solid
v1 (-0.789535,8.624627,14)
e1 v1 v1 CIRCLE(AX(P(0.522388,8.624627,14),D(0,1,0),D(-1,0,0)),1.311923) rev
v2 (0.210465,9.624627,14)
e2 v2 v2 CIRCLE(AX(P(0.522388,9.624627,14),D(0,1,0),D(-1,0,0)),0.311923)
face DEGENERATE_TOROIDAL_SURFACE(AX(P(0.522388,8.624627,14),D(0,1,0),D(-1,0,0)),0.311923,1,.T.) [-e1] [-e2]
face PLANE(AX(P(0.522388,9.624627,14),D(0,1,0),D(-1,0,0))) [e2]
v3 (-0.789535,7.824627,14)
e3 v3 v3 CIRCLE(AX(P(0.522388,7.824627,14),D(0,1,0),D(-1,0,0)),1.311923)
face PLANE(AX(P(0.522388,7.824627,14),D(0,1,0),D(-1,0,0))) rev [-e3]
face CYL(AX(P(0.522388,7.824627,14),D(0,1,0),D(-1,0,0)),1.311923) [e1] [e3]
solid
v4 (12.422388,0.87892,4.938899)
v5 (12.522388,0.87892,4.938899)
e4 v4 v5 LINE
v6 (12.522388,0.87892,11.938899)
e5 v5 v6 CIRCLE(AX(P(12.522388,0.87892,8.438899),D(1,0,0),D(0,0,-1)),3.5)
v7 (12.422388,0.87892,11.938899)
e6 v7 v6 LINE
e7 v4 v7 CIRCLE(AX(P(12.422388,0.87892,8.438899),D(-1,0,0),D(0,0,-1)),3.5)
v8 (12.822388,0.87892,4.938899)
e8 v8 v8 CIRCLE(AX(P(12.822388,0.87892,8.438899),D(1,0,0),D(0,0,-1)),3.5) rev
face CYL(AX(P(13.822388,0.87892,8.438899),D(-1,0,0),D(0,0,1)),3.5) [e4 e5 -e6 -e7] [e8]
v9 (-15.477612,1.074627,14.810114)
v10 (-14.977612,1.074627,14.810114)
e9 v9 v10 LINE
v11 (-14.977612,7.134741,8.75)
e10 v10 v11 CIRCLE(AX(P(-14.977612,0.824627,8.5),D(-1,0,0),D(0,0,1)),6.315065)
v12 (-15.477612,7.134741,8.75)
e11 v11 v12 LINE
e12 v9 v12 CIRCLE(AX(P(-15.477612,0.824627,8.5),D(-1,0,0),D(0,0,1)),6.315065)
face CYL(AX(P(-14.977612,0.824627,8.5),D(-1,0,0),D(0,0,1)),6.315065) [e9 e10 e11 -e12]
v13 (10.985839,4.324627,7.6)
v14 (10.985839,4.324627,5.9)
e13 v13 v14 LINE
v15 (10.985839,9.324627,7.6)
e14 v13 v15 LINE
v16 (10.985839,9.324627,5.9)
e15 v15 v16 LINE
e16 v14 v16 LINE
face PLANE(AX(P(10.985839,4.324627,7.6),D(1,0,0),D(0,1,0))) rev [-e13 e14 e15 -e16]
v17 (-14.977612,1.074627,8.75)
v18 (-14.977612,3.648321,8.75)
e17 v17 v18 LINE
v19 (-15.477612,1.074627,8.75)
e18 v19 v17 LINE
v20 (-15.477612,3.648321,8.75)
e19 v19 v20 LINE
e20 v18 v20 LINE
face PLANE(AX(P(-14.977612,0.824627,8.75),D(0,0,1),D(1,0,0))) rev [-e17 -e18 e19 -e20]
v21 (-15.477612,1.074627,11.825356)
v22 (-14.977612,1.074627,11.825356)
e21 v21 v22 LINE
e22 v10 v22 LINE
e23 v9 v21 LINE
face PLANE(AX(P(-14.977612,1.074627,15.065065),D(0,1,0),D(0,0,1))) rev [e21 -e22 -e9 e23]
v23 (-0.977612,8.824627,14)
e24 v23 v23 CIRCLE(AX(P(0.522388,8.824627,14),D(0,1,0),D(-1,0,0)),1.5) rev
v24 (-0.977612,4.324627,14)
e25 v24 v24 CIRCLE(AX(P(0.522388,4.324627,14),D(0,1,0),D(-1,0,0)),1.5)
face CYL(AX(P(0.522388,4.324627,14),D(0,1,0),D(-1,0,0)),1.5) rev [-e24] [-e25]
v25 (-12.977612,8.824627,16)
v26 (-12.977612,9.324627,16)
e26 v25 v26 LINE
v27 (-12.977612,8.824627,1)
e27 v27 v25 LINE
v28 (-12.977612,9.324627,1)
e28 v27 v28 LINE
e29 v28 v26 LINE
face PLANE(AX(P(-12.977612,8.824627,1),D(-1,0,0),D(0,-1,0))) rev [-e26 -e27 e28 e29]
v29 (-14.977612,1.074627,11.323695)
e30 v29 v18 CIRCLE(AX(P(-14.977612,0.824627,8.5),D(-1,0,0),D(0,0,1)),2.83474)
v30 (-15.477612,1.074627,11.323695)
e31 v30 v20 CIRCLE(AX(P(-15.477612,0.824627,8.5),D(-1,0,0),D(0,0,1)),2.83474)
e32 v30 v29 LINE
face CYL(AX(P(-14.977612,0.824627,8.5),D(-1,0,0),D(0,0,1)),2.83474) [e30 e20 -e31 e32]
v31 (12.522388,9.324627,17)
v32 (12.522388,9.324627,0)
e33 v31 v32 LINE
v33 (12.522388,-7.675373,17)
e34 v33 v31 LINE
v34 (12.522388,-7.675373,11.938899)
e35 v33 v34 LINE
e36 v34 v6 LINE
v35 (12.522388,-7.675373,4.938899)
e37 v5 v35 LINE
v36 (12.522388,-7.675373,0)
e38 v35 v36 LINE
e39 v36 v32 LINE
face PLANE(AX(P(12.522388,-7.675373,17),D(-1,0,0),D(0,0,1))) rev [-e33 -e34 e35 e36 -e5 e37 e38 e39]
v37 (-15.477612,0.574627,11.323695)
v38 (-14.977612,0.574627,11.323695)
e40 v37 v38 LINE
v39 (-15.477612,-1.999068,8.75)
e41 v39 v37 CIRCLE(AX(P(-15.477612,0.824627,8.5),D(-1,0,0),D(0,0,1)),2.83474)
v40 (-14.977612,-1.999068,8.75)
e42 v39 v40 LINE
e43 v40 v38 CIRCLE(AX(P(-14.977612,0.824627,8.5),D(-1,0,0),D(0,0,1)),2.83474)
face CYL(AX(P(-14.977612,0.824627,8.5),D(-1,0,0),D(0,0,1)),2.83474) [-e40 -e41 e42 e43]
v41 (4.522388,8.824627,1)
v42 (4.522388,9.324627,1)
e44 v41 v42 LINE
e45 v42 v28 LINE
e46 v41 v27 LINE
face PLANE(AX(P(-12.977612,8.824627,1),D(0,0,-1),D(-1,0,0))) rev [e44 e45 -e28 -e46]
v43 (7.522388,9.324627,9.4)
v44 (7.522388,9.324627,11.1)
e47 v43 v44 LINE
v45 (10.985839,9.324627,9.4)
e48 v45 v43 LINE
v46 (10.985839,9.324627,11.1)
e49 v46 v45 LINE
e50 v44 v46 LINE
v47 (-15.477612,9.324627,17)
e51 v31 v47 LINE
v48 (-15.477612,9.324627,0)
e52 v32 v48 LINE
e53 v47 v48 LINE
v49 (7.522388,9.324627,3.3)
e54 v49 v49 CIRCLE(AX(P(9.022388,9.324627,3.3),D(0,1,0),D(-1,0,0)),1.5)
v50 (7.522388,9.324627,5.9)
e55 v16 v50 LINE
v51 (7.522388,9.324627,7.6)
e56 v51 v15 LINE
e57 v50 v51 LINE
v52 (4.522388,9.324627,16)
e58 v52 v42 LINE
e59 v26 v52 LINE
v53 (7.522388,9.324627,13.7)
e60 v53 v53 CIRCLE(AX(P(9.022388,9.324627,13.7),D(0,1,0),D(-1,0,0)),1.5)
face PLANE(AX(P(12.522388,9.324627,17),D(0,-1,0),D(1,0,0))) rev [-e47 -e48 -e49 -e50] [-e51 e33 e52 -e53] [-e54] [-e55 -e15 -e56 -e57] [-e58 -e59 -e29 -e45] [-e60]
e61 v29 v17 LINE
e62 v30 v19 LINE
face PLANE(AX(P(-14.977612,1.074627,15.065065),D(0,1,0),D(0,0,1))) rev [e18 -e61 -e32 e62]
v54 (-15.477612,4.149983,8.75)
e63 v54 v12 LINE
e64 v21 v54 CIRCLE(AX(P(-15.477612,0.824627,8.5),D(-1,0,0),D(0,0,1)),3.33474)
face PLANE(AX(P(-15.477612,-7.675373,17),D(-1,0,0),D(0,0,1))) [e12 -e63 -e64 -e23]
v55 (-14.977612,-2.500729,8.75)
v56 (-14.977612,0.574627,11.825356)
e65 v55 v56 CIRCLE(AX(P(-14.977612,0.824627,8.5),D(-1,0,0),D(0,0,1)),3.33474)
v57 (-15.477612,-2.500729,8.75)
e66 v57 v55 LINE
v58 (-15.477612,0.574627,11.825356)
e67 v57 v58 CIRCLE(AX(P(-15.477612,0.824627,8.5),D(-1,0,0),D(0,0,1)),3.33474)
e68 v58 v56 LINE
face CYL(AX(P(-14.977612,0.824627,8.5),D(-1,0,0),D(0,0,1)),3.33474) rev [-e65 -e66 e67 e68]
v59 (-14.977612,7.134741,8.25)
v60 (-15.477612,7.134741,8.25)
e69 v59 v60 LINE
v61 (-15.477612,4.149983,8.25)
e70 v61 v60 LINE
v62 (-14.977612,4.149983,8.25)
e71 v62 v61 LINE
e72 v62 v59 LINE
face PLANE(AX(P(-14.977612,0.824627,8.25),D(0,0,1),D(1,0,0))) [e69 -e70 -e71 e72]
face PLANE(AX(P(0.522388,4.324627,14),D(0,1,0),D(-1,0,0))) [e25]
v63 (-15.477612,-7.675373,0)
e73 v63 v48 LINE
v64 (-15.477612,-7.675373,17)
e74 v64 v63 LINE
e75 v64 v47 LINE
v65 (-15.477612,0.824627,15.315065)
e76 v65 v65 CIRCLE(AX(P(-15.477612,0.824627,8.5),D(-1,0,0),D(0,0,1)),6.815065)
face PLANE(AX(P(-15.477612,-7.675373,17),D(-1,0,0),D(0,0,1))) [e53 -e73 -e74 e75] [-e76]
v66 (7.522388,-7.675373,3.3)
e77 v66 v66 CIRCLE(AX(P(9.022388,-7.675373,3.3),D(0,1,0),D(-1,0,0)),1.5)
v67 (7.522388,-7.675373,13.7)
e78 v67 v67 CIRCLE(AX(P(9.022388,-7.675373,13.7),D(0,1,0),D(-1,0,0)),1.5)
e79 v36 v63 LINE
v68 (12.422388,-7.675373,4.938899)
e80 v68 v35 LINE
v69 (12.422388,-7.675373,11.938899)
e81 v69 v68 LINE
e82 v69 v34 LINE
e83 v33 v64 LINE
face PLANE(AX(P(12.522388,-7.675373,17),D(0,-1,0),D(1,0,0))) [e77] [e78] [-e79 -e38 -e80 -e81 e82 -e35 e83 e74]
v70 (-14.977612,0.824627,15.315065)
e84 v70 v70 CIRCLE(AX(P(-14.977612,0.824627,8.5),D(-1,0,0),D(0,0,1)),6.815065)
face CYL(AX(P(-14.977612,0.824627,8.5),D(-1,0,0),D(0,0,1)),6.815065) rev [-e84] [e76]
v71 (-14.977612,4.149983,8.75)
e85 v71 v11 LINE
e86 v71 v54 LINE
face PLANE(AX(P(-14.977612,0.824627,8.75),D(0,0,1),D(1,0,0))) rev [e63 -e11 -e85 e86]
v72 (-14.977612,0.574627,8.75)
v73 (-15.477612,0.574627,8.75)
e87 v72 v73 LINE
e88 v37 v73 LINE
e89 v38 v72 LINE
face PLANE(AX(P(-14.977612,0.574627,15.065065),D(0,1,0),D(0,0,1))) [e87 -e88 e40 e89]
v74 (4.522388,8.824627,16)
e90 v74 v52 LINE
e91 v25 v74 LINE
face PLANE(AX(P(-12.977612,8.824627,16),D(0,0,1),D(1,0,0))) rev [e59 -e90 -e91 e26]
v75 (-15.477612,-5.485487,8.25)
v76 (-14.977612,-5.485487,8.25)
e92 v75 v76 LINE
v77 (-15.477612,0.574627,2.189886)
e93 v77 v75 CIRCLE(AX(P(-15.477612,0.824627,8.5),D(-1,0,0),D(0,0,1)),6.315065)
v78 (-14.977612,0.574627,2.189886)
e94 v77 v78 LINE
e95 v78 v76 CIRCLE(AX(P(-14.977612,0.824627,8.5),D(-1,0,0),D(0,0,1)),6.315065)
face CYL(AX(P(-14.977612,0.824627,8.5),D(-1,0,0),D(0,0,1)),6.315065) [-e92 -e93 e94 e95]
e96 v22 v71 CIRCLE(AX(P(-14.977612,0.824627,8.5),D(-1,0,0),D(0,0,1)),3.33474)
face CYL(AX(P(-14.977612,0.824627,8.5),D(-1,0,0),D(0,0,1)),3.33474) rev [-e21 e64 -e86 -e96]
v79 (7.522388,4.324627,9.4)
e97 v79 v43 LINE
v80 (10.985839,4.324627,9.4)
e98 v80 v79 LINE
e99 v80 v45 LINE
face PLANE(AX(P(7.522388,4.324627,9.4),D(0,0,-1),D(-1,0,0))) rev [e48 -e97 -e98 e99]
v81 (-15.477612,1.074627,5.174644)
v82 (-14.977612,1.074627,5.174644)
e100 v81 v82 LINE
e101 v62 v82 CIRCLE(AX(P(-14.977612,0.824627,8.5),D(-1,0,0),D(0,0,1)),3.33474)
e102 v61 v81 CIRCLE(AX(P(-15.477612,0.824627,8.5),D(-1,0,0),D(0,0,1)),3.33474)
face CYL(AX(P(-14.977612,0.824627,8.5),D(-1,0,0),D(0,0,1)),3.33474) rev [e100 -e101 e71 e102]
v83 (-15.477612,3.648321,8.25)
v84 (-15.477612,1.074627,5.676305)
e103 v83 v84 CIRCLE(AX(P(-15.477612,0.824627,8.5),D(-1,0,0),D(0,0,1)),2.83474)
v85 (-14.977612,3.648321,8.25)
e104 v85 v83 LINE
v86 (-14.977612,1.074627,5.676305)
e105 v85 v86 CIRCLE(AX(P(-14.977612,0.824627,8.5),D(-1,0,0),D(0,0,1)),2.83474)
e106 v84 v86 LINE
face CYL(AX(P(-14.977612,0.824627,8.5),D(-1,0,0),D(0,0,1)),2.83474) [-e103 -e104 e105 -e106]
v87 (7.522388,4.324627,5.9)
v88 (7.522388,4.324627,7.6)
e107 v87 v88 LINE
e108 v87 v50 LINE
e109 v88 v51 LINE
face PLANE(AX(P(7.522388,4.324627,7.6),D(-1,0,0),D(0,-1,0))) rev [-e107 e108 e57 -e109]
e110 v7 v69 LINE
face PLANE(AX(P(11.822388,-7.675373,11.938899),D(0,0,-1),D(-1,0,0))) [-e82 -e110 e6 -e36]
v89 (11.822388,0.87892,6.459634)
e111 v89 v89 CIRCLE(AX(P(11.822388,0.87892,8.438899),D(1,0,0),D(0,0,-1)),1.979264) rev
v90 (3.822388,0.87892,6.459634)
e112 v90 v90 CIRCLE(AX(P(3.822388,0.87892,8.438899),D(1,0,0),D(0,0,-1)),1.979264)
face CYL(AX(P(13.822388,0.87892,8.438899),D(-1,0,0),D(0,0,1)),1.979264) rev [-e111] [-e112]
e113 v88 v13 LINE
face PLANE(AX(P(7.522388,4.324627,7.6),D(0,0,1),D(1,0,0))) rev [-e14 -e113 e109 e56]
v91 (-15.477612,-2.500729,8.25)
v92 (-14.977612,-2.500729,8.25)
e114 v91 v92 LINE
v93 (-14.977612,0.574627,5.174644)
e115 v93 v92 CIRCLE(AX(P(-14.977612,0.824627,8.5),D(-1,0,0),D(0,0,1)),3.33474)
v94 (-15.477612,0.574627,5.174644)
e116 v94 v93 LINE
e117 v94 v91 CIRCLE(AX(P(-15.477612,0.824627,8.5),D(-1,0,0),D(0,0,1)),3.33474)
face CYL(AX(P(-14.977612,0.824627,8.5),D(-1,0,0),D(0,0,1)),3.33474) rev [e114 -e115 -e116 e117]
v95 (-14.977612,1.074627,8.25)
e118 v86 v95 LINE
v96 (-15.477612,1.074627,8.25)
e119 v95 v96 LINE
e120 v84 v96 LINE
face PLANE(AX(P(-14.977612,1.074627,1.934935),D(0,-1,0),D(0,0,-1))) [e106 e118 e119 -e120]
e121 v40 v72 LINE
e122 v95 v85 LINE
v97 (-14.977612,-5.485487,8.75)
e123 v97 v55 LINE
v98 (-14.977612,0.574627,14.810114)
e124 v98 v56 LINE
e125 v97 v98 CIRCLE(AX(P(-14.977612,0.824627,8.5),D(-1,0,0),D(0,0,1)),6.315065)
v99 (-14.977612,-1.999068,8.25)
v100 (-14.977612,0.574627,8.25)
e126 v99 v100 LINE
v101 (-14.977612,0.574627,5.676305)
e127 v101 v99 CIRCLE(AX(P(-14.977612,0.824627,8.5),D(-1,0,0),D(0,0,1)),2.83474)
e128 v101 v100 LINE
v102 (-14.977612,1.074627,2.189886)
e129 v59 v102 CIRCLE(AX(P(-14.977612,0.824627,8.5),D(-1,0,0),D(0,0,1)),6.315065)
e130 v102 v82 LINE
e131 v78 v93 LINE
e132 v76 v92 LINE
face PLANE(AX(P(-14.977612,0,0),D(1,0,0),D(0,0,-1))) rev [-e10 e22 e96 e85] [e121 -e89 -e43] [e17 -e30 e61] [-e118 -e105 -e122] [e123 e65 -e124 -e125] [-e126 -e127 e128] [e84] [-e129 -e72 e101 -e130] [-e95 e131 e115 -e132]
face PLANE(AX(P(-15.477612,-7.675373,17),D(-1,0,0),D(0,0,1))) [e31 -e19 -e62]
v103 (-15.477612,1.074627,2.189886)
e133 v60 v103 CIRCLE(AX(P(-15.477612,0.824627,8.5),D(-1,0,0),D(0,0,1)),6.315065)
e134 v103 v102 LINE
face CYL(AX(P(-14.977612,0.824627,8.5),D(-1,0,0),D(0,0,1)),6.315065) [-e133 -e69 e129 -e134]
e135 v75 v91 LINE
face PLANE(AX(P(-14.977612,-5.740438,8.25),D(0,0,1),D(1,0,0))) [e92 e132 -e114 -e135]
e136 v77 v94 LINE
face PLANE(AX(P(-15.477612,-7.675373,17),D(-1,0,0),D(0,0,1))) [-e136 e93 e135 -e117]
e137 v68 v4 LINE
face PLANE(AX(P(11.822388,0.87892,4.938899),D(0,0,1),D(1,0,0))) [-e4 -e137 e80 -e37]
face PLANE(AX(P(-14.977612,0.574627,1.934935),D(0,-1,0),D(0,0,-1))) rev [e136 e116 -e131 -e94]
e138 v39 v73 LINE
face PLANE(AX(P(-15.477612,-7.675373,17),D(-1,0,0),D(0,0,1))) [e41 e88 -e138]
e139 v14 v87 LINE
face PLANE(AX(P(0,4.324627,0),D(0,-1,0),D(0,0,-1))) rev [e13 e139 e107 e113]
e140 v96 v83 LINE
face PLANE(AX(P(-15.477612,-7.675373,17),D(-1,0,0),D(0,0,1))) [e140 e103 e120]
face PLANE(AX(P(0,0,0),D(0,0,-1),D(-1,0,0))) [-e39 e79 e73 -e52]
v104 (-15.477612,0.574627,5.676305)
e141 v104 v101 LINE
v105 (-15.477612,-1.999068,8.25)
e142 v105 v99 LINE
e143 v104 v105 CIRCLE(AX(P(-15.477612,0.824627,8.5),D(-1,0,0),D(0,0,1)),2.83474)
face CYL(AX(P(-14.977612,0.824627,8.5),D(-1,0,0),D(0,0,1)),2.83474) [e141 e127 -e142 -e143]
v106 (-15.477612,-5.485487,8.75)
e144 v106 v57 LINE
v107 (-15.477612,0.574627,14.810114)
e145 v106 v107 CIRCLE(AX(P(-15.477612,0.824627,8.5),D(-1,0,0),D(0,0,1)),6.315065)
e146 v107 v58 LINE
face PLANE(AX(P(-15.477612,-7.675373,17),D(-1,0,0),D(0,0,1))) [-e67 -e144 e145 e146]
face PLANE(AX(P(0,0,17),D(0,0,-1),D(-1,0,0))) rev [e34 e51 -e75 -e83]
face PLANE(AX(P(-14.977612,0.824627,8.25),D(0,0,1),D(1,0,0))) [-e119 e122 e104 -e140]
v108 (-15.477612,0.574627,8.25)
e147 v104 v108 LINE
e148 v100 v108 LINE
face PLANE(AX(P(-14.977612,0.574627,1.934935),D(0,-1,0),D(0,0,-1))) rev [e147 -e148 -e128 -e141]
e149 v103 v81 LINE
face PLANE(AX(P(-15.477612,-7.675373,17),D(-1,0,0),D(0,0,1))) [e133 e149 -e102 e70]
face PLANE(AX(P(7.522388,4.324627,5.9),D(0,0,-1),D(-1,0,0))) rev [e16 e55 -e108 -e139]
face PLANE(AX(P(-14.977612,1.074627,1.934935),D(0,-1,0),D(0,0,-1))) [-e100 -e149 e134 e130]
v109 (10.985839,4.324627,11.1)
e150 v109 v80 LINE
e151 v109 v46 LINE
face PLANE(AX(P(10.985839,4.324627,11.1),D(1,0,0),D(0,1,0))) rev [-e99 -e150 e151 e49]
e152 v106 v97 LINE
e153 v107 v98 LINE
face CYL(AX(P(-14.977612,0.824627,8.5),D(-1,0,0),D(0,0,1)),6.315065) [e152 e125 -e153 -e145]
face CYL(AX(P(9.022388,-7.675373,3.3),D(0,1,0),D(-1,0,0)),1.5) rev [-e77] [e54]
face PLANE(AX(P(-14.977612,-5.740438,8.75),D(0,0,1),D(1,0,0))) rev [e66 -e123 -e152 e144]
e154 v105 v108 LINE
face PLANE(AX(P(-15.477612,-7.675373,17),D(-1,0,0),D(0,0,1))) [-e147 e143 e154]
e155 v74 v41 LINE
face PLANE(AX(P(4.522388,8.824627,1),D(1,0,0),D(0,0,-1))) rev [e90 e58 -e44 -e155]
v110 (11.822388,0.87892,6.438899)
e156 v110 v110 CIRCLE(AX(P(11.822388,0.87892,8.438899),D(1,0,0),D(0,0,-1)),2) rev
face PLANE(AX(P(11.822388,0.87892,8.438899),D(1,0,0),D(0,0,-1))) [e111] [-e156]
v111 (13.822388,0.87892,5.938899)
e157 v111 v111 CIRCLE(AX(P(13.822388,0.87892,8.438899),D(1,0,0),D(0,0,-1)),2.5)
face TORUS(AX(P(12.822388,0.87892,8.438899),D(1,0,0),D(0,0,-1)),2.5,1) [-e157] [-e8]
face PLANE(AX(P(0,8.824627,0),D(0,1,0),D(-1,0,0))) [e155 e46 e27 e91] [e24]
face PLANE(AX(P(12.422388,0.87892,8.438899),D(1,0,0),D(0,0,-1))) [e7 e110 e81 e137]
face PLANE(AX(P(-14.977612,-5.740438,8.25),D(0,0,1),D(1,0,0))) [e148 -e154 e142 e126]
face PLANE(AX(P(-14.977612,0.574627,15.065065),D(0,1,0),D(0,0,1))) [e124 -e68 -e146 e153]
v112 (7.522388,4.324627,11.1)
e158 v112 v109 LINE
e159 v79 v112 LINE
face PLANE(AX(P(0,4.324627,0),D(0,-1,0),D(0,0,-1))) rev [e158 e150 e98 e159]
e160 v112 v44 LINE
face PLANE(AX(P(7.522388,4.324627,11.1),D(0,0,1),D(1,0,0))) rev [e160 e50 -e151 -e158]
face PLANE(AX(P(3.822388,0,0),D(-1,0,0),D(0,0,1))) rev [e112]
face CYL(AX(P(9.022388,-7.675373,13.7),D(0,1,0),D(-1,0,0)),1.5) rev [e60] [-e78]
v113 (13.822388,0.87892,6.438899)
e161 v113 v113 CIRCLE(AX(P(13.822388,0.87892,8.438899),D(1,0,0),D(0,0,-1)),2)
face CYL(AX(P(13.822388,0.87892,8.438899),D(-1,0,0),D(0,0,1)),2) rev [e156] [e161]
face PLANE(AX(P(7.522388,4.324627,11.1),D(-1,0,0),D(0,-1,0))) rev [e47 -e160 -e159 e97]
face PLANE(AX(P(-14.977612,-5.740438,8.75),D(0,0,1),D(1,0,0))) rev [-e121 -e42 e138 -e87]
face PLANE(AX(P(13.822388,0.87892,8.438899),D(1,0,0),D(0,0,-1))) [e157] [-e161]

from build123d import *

# Parameters (mm, degrees)
SKETCH_1_W              = 28
SKETCH_1_H              = 17
EXTRUDE_1_DEPTH         = 17
SKETCH_2_R              = 1.5
CUT_EXTRUDE_2_DEPTH     = 17
SKETCH_3_R              = 1.5
CUT_EXTRUDE_3_DEPTH     = 5
SKETCH_4_W              = 17.5
SKETCH_4_H              = 15
CUT_EXTRUDE_4_DEPTH     = 0.5
CUT_EXTRUDE_START       = -0.5
CUT_EXTRUDE_1_OUTLINE_R = 6.815064579
CUT_EXTRUDE_1_DEPTH     = 0.5
CUT_EXTRUDE_5_DEPTH     = 0.7
EXTRUDE_START           = 2
SKETCH_7_R              = 3.5
SKETCH_7_R_2            = 2
EXTRUDE_2_DEPTH         = 2
FILLET_1_R              = 1
EXTRUDE_START_2         = 0.6
EXTRUDE_17_DEPTH        = 0.6
EXTRUDE_18_DEPTH        = 0.8
EXTRUDE_18_DEPTH_BACK   = 1
SKETCH_9_R              = 1.311922651
FILLET_2_R              = 1
SKETCH_10_W             = 3.463451164
SKETCH_10_H             = 1.7
CUT_EXTRUDE_6_DEPTH     = 5
CUT_EXTRUDE_START_2     = 3.82238806
CUT_EXTRUDE_7_OUTLINE_R = 1.979264392
CUT_EXTRUDE_7_DEPTH     = 8


# Read off the part's stored shape, not the designer's step: Вырез-Вытянуть-Тонкостенный1, Вырез-Вытянуть7
with BuildPart() as part:
    # Эскиз1 → Бобышка-Вытянуть1 (new body)
    with BuildSketch(Plane.XY):
        with Locations((-1.47761194, 0.824626866)):
            Rectangle(SKETCH_1_W, SKETCH_1_H)
    extrude(amount=EXTRUDE_1_DEPTH)

    # Эскиз2 → Вырез-Вытянуть2 (cut)
    with BuildSketch(Plane(origin=(0, 9.324626866, 0), x_dir=(1, 0, 0), z_dir=(0, 1, 0))):
        with Locations(Location((9.02238806, -3.3, 0), (0, 0, 180))):
            Circle(SKETCH_2_R)
        with Locations(Location((9.02238806, -13.7, 0), (0, 0, 180))):
            Circle(SKETCH_2_R)
    extrude(amount=-CUT_EXTRUDE_2_DEPTH, mode=Mode.SUBTRACT)

    # Эскиз3 → Вырез-Вытянуть3 (cut)
    with BuildSketch(Plane(origin=(0, 9.324626866, 0), x_dir=(1, 0, 0), z_dir=(0, 1, 0))):
        with Locations(Location((0.52238806, -14, 0), (0, 0, 180))):
            Circle(SKETCH_3_R)
    extrude(amount=-CUT_EXTRUDE_3_DEPTH, mode=Mode.SUBTRACT)

    # Эскиз4 → Вырез-Вытянуть4 (cut)
    with BuildSketch(Plane(origin=(0, 9.324626866, 0), x_dir=(1, 0, 0), z_dir=(0, 1, 0))):
        with Locations((-4.22761194, -8.5)):
            Rectangle(SKETCH_4_W, SKETCH_4_H)
    extrude(amount=-CUT_EXTRUDE_4_DEPTH, mode=Mode.SUBTRACT)

    # Вырез-Вытянуть-Тонкостенный1 outline → Вырез-Вытянуть-Тонкостенный1 (cut)
    with BuildSketch(Plane.ZY.offset(15.47761194).offset(CUT_EXTRUDE_START)):
        with Locations((8.5, 0.824626866)):
            Circle(CUT_EXTRUDE_1_OUTLINE_R)
        with BuildLine():
            Line((2.189885845, 0.574626866), (5.174644222, 0.574626866))
            ThreePointArc((5.174644222, 0.574626866), (6.141982713, -1.533390421), (8.25, -2.500728912))
            Line((8.25, -2.500728912), (8.25, -5.485487289))
            ThreePointArc((8.25, -5.485487289), (4.034575012, -3.640798122), (2.189885845, 0.574626866))
        make_face(mode=Mode.SUBTRACT)
        with BuildLine():
            ThreePointArc((8.25, -1.999067704), (6.495536104, -1.17983703), (5.67630543, 0.574626866))
            Line((5.67630543, 0.574626866), (8.25, 0.574626866))
            Line((8.25, 0.574626866), (8.25, -1.999067704))
        make_face(mode=Mode.SUBTRACT)
        with BuildLine():
            Line((8.75, -5.485487289), (8.75, -2.500728912))
            ThreePointArc((8.75, -2.500728912), (10.858017287, -1.533390421), (11.825355778, 0.574626866))
            Line((11.825355778, 0.574626866), (14.810114155, 0.574626866))
            ThreePointArc((14.810114155, 0.574626866), (12.965424988, -3.640798122), (8.75, -5.485487289))
        make_face(mode=Mode.SUBTRACT)
        with BuildLine():
            ThreePointArc((11.32369457, 0.574626866), (10.504463896, -1.17983703), (8.75, -1.999067704))
            Line((8.75, -1.999067704), (8.75, 0.574626866))
            Line((8.75, 0.574626866), (11.32369457, 0.574626866))
        make_face(mode=Mode.SUBTRACT)
        with BuildLine():
            ThreePointArc((5.67630543, 1.074626866), (6.495536104, 2.829090762), (8.25, 3.648321435))
            Line((8.25, 3.648321435), (8.25, 1.074626866))
            Line((8.25, 1.074626866), (5.67630543, 1.074626866))
        make_face(mode=Mode.SUBTRACT)
        with BuildLine():
            Line((8.25, 7.13474102), (8.25, 4.149982644))
            ThreePointArc((8.25, 4.149982644), (6.141982714, 3.182644152), (5.174644222, 1.074626866))
            Line((5.174644222, 1.074626866), (2.189885845, 1.074626866))
            ThreePointArc((2.189885845, 1.074626866), (4.034575012, 5.290051853), (8.25, 7.13474102))
        make_face(mode=Mode.SUBTRACT)
        with BuildLine():
            ThreePointArc((8.75, 3.648321435), (10.504463896, 2.829090762), (11.32369457, 1.074626866))
            Line((11.32369457, 1.074626866), (8.75, 1.074626866))
            Line((8.75, 1.074626866), (8.75, 3.648321435))
        make_face(mode=Mode.SUBTRACT)
        with BuildLine():
            Line((14.810114155, 1.074626866), (11.825355778, 1.074626866))
            ThreePointArc((11.825355778, 1.074626866), (10.858017286, 3.182644152), (8.75, 4.149982644))
            Line((8.75, 4.149982644), (8.75, 7.13474102))
            ThreePointArc((8.75, 7.13474102), (12.965424988, 5.290051853), (14.810114155, 1.074626866))
        make_face(mode=Mode.SUBTRACT)
    extrude(amount=CUT_EXTRUDE_1_DEPTH, mode=Mode.SUBTRACT)

    # Эскиз6 → Вырез-Вытянуть5 (cut)
    with BuildSketch(Plane(origin=(12.52238806, 0, 0), x_dir=(0, 0, -1), z_dir=(1, 0, 0))):
        with BuildLine():
            Line((-11.938898547, -7.675373134), (-11.938898547, 0.878920234))
            ThreePointArc((-11.938898547, 0.878920234), (-8.438898547, 4.378920234), (-4.938898547, 0.878920234))
            Line((-4.938898547, 0.878920234), (-4.938898547, -7.675373134))
            Line((-4.938898547, -7.675373134), (-11.938898547, -7.675373134))
        make_face()
    extrude(amount=-CUT_EXTRUDE_5_DEPTH, mode=Mode.SUBTRACT)

    # Эскиз7 → Бобышка-Вытянуть2 (add)
    with BuildSketch(Plane(origin=(11.82238806, 0, 0), x_dir=(0, 0, -1), z_dir=(1, 0, 0)).offset(EXTRUDE_START)):
        with Locations((-8.438898547, 0.878920234)):
            Circle(SKETCH_7_R)
        with Locations((-8.438898547, 0.878920234)):
            Circle(SKETCH_7_R_2, mode=Mode.SUBTRACT)
    extrude(amount=-EXTRUDE_2_DEPTH)

    # Скругление1
    fillet_1_edges = [part.edges().sort_by_distance(p)[0] for p in [
        (13.82238806, 0.878920234, 11.938898547),
    ]]
    fillet(fillet_1_edges, radius=FILLET_1_R)

    # Эскиз8 → Бобышка-Вытянуть17 (add)
    with BuildSketch(Plane(origin=(11.82238806, 0, 0), x_dir=(0, 0, -1), z_dir=(1, 0, 0)).offset(EXTRUDE_START_2)):
        with BuildLine():
            Line((-11.938898547, -7.675373134), (-4.938898547, -7.675373134))
            Line((-4.938898547, -7.675373134), (-4.938898547, 0.878920234))
            ThreePointArc((-4.938898547, 0.878920234), (-8.438898547, -2.621079766), (-11.938898547, 0.878920234))
            Line((-11.938898547, 0.878920234), (-11.938898547, -7.675373134))
        make_face()
    extrude(amount=-EXTRUDE_17_DEPTH)

    # Эскиз10 → Вырез-Вытянуть6 (cut)
    with BuildSketch(Plane(origin=(0, 9.324626866, 0), x_dir=(1, 0, 0), z_dir=(0, 1, 0))):
        with Locations((9.254113642, -10.25)):
            Rectangle(SKETCH_10_W, SKETCH_10_H)
        with Locations((9.254113642, -6.75)):
            Rectangle(SKETCH_10_W, SKETCH_10_H)
    extrude(amount=-CUT_EXTRUDE_6_DEPTH, mode=Mode.SUBTRACT)

    # Вырез-Вытянуть7 outline → Вырез-Вытянуть7 (cut)
    with BuildSketch(Plane.YZ.offset(CUT_EXTRUDE_START_2)):
        with Locations((0.878920234, 8.438898547)):
            Circle(CUT_EXTRUDE_7_OUTLINE_R)
    extrude(amount=CUT_EXTRUDE_7_DEPTH, mode=Mode.SUBTRACT)


with BuildPart() as body_2:
    # Эскиз9 → Бобышка-Вытянуть18 (new, two sides: drawn at the far end of the back side and taken through both)
    with BuildSketch(Plane(origin=(0, 8.824626866, 0), x_dir=(1, 0, 0), z_dir=(0, 1, 0)).offset(-EXTRUDE_18_DEPTH_BACK)):
        with Locations(Location((0.52238806, -14, 0), (0, 0, 180))):
            Circle(SKETCH_9_R)
    extrude(amount=EXTRUDE_18_DEPTH + EXTRUDE_18_DEPTH_BACK)

    # Скругление2
    fillet_2_edges = [body_2.edges().sort_by_distance(p)[0] for p in [
        (1.834310711, 9.624626866, 14),
    ]]
    fillet(fillet_2_edges, radius=FILLET_2_R)


solid = Compound([part.part, body_2.part])
